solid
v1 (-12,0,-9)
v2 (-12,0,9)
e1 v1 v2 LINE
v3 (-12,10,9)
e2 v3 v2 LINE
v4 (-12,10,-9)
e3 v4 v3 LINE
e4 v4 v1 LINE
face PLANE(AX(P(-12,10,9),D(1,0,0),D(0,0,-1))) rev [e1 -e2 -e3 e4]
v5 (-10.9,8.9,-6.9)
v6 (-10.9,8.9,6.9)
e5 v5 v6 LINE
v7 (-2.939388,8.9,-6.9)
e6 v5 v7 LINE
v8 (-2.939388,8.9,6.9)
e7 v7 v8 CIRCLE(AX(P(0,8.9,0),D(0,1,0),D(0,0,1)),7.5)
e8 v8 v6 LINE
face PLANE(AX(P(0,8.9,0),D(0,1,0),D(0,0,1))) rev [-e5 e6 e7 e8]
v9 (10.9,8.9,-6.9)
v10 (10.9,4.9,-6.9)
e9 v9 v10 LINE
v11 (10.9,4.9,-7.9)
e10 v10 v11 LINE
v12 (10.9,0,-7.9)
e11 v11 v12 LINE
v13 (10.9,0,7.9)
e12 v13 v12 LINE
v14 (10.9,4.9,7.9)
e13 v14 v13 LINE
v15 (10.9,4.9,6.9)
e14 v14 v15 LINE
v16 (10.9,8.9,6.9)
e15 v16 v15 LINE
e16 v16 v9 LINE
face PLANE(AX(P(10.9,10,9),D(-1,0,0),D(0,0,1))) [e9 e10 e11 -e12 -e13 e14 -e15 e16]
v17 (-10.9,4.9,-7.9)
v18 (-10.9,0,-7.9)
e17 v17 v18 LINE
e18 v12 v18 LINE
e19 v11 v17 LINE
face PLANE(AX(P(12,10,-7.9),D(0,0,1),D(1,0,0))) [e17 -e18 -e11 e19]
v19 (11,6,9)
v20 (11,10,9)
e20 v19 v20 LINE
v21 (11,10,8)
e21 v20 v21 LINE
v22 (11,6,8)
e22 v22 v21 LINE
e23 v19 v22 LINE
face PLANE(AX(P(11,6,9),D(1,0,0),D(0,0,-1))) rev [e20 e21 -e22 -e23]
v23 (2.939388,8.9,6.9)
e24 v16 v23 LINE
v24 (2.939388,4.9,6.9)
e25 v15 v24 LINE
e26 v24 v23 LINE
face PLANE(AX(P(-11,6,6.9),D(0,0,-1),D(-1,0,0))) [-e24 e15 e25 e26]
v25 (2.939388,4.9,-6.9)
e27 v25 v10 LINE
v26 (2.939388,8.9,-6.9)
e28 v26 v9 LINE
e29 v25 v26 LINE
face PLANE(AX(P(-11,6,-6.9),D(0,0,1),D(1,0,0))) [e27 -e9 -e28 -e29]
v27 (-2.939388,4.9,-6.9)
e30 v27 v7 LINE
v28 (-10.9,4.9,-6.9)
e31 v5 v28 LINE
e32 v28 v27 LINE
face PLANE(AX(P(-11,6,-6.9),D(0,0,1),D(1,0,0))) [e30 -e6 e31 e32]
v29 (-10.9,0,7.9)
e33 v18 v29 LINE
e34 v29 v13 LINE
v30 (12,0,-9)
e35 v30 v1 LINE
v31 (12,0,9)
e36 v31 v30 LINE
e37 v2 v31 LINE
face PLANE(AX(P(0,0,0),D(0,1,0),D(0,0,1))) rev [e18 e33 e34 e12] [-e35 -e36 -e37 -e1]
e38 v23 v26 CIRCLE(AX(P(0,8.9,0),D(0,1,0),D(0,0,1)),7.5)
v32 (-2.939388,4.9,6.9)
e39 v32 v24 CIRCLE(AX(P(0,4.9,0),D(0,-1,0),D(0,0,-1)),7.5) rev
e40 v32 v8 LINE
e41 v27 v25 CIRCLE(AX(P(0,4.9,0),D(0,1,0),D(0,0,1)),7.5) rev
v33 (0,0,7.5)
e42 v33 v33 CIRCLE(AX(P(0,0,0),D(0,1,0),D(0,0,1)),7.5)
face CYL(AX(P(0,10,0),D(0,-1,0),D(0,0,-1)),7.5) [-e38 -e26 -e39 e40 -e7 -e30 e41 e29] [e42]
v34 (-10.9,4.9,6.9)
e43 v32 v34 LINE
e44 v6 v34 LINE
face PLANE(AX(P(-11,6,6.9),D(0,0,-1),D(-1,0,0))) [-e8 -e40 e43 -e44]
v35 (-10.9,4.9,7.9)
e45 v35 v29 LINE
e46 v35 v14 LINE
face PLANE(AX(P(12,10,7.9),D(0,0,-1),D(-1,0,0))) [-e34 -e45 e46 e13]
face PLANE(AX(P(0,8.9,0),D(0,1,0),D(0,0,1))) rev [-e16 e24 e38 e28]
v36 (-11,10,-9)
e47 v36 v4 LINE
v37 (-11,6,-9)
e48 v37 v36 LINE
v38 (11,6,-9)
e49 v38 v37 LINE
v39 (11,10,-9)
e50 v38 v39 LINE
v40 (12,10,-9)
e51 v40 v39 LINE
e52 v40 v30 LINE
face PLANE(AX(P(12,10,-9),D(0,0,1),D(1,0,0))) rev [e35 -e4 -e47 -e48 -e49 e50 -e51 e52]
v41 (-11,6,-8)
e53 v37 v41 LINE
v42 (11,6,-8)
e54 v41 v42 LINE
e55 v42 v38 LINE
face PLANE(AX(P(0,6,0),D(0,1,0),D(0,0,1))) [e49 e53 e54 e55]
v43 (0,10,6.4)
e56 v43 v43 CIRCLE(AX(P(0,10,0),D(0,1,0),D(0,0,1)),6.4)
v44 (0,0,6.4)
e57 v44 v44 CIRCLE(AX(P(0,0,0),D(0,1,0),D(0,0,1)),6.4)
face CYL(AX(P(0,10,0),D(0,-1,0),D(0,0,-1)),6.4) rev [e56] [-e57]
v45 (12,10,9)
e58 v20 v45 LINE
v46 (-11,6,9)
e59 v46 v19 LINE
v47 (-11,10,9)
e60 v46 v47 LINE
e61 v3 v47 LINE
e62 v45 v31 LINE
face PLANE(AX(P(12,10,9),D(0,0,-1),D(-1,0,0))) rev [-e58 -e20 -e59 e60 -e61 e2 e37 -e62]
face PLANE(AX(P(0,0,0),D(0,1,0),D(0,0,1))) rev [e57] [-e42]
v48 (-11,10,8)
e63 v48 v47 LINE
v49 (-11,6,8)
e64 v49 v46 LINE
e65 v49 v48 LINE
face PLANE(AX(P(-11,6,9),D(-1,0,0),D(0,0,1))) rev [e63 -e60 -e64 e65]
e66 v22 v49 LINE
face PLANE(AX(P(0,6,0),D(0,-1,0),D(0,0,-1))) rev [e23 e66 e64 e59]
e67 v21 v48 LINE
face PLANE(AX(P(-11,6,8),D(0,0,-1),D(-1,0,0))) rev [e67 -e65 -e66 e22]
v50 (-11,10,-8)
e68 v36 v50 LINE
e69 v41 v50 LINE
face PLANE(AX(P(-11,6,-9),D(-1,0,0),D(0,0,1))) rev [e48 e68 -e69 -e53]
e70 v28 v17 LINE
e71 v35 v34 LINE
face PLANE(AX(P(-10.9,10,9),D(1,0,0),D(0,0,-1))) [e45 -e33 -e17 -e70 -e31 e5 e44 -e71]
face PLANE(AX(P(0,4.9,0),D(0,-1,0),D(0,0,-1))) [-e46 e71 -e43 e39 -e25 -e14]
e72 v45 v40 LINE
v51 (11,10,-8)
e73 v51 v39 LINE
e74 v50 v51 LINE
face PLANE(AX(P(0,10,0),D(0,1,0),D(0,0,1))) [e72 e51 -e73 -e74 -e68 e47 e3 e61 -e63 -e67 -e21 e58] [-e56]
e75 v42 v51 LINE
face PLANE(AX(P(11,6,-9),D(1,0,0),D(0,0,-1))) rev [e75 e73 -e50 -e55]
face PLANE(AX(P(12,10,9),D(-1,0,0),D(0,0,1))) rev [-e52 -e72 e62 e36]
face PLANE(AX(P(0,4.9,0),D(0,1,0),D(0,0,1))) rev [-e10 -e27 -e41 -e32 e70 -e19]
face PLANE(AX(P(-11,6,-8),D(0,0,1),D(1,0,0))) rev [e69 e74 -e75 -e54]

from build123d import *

# Parameters (mm, degrees)
SKETCH1_W           = 24
SKETCH1_H           = 18
SKETCH1_R           = 6.4
BOSS_EXTRUDE1_DEPTH = 10
SKETCH2_W           = 22
SKETCH2_H           = 1
CUT_EXTRUDE1_DEPTH  = 4
SHELL1_DEPTH        = 8.9
SHELL1_2_DEPTH      = 4.9


# Read off the part's stored shape, not the designer's step: Shell1
with BuildPart() as part:
    # Sketch1 → Boss-Extrude1 (new body)
    with BuildSketch(Plane(origin=(0, 0, 0), x_dir=(1, 0, 0), z_dir=(0, 1, 0))):
        Rectangle(SKETCH1_W, SKETCH1_H)
        with Locations(Location((0, 0, 0), (0, 0, 270))):
            Circle(SKETCH1_R, mode=Mode.SUBTRACT)
    extrude(amount=BOSS_EXTRUDE1_DEPTH)

    # Sketch2 → Cut-Extrude1 (cut)
    with BuildSketch(Plane(origin=(0, 10, 0), x_dir=(1, 0, 0), z_dir=(0, 1, 0))):
        with Locations((0, 8.5)):
            Rectangle(SKETCH2_W, SKETCH2_H)
        with Locations((0, -8.5)):
            Rectangle(SKETCH2_W, SKETCH2_H)
    extrude(amount=-CUT_EXTRUDE1_DEPTH, mode=Mode.SUBTRACT)

    # Shell1 outline → Shell1 (cut)
    with BuildSketch(Plane(origin=(0, 0, 0), x_dir=(1, 0, 0), z_dir=(0, 1, 0))):
        with BuildLine():
            ThreePointArc((2.939387691, 6.9), (7.5, 0), (2.939387691, -6.9))
            Line((2.939387691, -6.9), (10.9, -6.9))
            Line((10.9, -6.9), (10.9, 6.9))
            Line((10.9, 6.9), (2.939387691, 6.9))
        make_face()
        with BuildLine():
            ThreePointArc((-2.939387691, -6.9), (-7.5, 0), (-2.939387691, 6.9))
            Line((-2.939387691, 6.9), (-10.9, 6.9))
            Line((-10.9, 6.9), (-10.9, -6.9))
            Line((-10.9, -6.9), (-2.939387691, -6.9))
        make_face()
    extrude(amount=SHELL1_DEPTH, mode=Mode.SUBTRACT)

    # Shell1 2 outline → Shell1 2 (cut)
    with BuildSketch(Plane(origin=(0, 0, 0), x_dir=(1, 0, 0), z_dir=(0, 1, 0))):
        with BuildLine():
            ThreePointArc((-2.939387691, 6.9), (0, 7.5), (2.939387691, 6.9))
            Line((2.939387691, 6.9), (10.9, 6.9))
            Line((10.9, 6.9), (10.9, 7.9))
            Line((10.9, 7.9), (-10.9, 7.9))
            Line((-10.9, 7.9), (-10.9, 6.9))
            Line((-10.9, 6.9), (-2.939387691, 6.9))
        make_face()
        with BuildLine():
            Line((10.9, -6.9), (2.939387691, -6.9))
            ThreePointArc((2.939387691, -6.9), (0, -7.5), (-2.939387691, -6.9))
            Line((-2.939387691, -6.9), (-10.9, -6.9))
            Line((-10.9, -6.9), (-10.9, -7.9))
            Line((-10.9, -7.9), (10.9, -7.9))
            Line((10.9, -7.9), (10.9, -6.9))
        make_face()
    extrude(amount=SHELL1_2_DEPTH, mode=Mode.SUBTRACT)


solid = part.part
